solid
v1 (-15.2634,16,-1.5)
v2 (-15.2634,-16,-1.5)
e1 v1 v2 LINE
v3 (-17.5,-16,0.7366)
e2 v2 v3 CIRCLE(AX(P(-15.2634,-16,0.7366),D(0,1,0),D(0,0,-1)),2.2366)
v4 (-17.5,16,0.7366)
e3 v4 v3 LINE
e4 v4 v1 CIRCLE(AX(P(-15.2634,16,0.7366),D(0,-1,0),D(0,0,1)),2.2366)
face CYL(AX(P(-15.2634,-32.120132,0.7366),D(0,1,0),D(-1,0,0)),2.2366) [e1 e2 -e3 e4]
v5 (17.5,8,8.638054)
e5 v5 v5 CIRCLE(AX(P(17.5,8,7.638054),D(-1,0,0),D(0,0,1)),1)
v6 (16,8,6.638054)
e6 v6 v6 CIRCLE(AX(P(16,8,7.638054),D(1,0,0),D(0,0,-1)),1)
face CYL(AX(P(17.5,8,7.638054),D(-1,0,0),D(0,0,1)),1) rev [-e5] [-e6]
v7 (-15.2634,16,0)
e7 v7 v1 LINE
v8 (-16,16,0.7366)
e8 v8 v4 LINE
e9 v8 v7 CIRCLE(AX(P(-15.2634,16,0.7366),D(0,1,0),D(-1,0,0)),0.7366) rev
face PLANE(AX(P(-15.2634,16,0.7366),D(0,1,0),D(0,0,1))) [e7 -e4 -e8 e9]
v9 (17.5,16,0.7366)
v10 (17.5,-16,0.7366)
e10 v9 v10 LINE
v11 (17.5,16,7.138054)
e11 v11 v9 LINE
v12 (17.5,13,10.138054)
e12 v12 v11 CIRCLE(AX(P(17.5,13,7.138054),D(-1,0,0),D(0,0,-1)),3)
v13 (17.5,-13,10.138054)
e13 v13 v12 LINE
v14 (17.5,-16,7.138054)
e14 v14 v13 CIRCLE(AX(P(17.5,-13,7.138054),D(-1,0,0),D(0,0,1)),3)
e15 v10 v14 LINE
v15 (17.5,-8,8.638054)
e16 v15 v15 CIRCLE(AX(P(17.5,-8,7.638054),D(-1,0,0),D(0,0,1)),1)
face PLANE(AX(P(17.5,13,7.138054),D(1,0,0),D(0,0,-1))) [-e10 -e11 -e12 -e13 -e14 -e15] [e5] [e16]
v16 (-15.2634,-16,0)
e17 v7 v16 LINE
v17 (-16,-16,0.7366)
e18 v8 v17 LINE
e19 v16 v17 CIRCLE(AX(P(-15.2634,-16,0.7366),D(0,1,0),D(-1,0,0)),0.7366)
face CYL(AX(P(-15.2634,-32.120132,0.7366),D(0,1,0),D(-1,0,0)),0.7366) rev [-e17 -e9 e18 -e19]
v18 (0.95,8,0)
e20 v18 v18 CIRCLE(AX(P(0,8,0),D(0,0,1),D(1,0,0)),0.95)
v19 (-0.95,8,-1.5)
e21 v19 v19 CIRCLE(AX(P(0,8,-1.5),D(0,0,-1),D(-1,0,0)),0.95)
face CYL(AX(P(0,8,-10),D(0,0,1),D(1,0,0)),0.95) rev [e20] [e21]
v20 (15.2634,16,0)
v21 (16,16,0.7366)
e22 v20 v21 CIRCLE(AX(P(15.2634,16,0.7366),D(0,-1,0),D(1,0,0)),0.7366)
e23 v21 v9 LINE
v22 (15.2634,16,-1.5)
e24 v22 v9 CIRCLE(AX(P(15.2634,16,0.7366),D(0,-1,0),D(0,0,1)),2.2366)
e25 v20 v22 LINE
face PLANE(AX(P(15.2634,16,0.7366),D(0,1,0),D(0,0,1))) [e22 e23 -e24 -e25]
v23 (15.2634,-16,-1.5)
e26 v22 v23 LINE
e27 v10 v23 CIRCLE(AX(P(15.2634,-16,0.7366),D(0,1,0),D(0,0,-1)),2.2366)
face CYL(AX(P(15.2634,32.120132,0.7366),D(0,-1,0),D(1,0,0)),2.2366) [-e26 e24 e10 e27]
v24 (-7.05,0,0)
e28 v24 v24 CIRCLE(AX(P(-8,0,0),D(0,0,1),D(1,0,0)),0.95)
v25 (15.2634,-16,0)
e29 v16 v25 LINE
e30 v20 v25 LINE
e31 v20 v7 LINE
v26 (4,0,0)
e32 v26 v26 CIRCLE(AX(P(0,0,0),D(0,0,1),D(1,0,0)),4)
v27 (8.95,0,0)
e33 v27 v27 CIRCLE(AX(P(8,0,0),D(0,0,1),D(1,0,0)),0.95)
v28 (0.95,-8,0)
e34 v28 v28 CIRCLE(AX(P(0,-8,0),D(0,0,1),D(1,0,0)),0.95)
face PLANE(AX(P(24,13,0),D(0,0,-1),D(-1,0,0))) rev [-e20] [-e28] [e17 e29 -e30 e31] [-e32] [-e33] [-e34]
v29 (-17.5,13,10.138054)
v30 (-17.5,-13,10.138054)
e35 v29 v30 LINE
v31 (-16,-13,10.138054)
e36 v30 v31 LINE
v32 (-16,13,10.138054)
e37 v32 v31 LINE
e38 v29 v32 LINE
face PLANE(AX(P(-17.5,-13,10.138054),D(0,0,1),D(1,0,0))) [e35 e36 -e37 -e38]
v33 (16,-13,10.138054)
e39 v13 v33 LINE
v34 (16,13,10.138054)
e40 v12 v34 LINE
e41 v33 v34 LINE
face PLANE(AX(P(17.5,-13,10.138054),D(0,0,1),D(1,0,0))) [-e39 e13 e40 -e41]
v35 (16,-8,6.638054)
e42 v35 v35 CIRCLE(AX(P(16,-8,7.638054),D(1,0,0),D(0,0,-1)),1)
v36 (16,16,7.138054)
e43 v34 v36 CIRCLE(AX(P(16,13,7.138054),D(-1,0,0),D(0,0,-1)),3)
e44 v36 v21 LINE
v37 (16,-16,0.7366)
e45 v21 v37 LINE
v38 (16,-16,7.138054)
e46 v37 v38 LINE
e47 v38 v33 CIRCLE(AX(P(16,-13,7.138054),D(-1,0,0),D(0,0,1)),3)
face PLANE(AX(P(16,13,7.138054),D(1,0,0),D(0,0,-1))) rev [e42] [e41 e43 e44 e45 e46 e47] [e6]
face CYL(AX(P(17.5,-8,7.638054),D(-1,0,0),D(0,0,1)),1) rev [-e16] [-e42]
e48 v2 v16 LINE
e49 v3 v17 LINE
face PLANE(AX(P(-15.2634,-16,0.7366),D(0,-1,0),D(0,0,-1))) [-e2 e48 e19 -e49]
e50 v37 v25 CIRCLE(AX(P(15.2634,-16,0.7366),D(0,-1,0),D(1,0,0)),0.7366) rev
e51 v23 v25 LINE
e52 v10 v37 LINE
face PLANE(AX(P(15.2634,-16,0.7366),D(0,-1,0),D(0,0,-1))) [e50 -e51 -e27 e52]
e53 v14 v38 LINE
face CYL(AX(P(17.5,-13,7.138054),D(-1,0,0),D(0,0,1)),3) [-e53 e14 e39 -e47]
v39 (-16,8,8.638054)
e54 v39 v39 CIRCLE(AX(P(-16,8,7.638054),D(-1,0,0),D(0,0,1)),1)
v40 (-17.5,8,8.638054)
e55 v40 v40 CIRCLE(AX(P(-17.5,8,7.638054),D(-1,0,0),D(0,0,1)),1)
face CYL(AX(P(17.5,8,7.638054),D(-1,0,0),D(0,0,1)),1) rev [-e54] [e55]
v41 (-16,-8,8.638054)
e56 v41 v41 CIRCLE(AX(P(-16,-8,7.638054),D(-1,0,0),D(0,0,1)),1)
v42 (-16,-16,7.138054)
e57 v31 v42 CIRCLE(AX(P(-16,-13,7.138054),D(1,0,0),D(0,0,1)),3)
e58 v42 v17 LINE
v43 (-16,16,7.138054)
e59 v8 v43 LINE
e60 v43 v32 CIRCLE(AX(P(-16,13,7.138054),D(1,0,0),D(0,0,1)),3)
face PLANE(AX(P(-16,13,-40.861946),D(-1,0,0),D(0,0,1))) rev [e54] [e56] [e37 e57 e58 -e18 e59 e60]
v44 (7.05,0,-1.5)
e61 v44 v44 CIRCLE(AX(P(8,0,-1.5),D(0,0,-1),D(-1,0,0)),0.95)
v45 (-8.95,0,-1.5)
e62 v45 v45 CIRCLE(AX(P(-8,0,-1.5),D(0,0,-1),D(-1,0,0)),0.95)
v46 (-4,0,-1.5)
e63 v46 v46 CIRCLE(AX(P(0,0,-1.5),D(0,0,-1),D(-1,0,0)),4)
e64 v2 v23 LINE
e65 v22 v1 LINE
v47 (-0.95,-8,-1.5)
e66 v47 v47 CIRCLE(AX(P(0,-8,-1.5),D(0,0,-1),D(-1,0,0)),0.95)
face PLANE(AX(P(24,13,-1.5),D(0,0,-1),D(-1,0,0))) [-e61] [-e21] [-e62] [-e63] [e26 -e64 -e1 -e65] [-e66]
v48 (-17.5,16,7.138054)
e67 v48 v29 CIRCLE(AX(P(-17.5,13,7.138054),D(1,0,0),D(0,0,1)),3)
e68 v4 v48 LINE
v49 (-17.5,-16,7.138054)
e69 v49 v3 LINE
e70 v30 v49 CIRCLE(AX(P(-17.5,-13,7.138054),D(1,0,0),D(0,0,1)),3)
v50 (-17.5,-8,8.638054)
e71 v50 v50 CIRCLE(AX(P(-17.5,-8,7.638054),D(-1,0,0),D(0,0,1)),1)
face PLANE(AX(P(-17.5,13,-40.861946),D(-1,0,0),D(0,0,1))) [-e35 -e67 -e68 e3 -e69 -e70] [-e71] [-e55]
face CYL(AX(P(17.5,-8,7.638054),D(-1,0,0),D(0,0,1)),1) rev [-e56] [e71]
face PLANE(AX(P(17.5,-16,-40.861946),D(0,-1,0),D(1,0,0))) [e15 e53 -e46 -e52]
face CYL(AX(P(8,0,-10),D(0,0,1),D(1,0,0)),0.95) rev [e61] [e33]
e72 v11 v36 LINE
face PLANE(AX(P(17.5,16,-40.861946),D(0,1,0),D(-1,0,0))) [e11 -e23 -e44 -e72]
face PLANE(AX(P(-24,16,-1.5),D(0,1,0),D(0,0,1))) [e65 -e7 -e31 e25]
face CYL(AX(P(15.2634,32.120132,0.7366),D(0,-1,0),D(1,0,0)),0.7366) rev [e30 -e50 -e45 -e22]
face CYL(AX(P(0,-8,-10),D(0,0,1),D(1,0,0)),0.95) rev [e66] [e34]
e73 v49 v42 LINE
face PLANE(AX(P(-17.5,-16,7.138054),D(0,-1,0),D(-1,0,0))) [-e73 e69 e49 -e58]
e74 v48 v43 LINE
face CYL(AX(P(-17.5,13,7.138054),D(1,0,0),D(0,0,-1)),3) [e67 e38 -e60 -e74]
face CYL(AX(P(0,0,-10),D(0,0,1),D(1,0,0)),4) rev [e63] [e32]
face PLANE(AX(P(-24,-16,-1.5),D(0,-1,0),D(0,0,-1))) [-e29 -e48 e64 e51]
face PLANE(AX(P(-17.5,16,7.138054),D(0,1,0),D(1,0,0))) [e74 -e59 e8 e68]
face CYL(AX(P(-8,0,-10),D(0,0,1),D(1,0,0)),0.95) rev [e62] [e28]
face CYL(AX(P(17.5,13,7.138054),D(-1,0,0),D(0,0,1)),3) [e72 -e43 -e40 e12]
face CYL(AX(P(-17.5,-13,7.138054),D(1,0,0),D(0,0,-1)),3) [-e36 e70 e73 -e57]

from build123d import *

# Parameters (mm, degrees)
SM_BASE_FLANGE_1_DEPTH = 1.5
OTHER_START            = -16
OTHER_1_DEPTH          = 32
OTHER_1_2_DEPTH        = 32
OTHER_START_2          = -18
OTHER_1_3_DEPTH        = 36
SKETCH_7_R             = 1
CUT_EXTRUDE_1_DEPTH    = 40.796735326
SKETCH_8_R             = 4
SKETCH_8_R_2           = 0.95
CUT_EXTRUDE_2_DEPTH    = 10


with BuildPart() as part:
    # 基体-法兰1: sheet metal written as solids
    # Sketch 1 → 基体-法兰1 (new body)
    with BuildSketch(Plane.XY):
        with BuildLine():
            Line((-24, -16), (24, -16))
            ThreePointArc((24, -16), (26.121320344, -15.121320344), (27, -13))
            Line((27, -13), (27, 13))
            ThreePointArc((27, 13), (26.121320344, 15.121320344), (24, 16))
            Line((24, 16), (-24, 16))
            ThreePointArc((-24, 16), (-26.121320344, 15.121320344), (-27, 13))
            Line((-27, 13), (-27, -13))
            ThreePointArc((-27, -13), (-26.121320344, -15.121320344), (-24, -16))
        make_face()
    extrude(amount=-SM_BASE_FLANGE_1_DEPTH)

    # Other 1: read off the stored shape, not the designer's step
    # Other 1 outline → Other 1 (cut)
    with BuildSketch(Plane(origin=(0, 0, 0), x_dir=(1, 0, 0), z_dir=(0, 1, 0)).offset(OTHER_START)):
        with BuildLine():
            ThreePointArc((-17.375223856, 0), (-16.558564082, 1.086838938), (-15.2634, 1.5))
            Line((-15.2634, 1.5), (-27, 1.5))
            Line((-27, 1.5), (-27, 0))
            Line((-27, 0), (-17.375223856, 0))
        make_face()
        with BuildLine():
            Line((27, 1.5), (15.2634, 1.5))
            ThreePointArc((15.2634, 1.5), (16.558564082, 1.086838938), (17.375223856, 0))
            Line((17.375223856, 0), (27, 0))
            Line((27, 0), (27, 1.5))
        make_face()
    extrude(amount=OTHER_1_DEPTH, mode=Mode.SUBTRACT)

    # Other 1 2 outline → Other 1 2 (add)
    with BuildSketch(Plane(origin=(0, 0, 0), x_dir=(1, 0, 0), z_dir=(0, 1, 0)).offset(OTHER_START)):
        with BuildLine():
            Line((-15.2634, 0), (-17.375223856, 0))
            ThreePointArc((-17.375223856, 0), (-17.468585343, -0.363053267), (-17.5, -0.7366))
            Line((-17.5, -0.7366), (-17.5, -10.138054181))
            Line((-17.5, -10.138054181), (-16, -10.138054181))
            Line((-16, -10.138054181), (-16, -0.7366))
            ThreePointArc((-16, -0.7366), (-15.784254855, -0.215745145), (-15.2634, 0))
        make_face()
        with BuildLine():
            ThreePointArc((17.5, -0.7366), (17.468585343, -0.363053267), (17.375223856, 0))
            Line((17.375223856, 0), (15.2634, 0))
            ThreePointArc((15.2634, 0), (15.784254855, -0.215745145), (16, -0.7366))
            Line((16, -0.7366), (16, -10.138054181))
            Line((16, -10.138054181), (17.5, -10.138054181))
            Line((17.5, -10.138054181), (17.5, -0.7366))
        make_face()
    extrude(amount=OTHER_1_2_DEPTH)

    # Other 1 3 outline → Other 1 3 (cut)
    with BuildSketch(Plane.YZ.offset(OTHER_START_2)):
        with BuildLine():
            ThreePointArc((-16, 7.138054181), (-15.121320344, 9.259374525), (-13, 10.138054181))
            Line((-13, 10.138054181), (-16, 10.138054181))
            Line((-16, 10.138054181), (-16, 7.138054181))
        make_face()
        with BuildLine():
            ThreePointArc((13, 10.138054181), (15.121320344, 9.259374525), (16, 7.138054181))
            Line((16, 7.138054181), (16, 10.138054181))
            Line((16, 10.138054181), (13, 10.138054181))
        make_face()
    extrude(amount=OTHER_1_3_DEPTH, mode=Mode.SUBTRACT)

    # 草图7 → 切除-拉伸1 (cut, through all)
    with BuildSketch(Plane.ZY.offset(17.5)):
        with Locations((7.638054181, 8)):
            Circle(SKETCH_7_R)
        with Locations((7.638054181, -8)):
            Circle(SKETCH_7_R)
    extrude(amount=-CUT_EXTRUDE_1_DEPTH, mode=Mode.SUBTRACT)

    # 草图8 → 切除-拉伸2 (cut)
    with BuildSketch(Plane.XY):
        Circle(SKETCH_8_R)
        with Locations((0, 8)):
            Circle(SKETCH_8_R_2)
        with Locations((8, 0)):
            Circle(SKETCH_8_R_2)
        with Locations((0, -8)):
            Circle(SKETCH_8_R_2)
        with Locations((-8, 0)):
            Circle(SKETCH_8_R_2)
    extrude(amount=-CUT_EXTRUDE_2_DEPTH, mode=Mode.SUBTRACT)


solid = part.part
